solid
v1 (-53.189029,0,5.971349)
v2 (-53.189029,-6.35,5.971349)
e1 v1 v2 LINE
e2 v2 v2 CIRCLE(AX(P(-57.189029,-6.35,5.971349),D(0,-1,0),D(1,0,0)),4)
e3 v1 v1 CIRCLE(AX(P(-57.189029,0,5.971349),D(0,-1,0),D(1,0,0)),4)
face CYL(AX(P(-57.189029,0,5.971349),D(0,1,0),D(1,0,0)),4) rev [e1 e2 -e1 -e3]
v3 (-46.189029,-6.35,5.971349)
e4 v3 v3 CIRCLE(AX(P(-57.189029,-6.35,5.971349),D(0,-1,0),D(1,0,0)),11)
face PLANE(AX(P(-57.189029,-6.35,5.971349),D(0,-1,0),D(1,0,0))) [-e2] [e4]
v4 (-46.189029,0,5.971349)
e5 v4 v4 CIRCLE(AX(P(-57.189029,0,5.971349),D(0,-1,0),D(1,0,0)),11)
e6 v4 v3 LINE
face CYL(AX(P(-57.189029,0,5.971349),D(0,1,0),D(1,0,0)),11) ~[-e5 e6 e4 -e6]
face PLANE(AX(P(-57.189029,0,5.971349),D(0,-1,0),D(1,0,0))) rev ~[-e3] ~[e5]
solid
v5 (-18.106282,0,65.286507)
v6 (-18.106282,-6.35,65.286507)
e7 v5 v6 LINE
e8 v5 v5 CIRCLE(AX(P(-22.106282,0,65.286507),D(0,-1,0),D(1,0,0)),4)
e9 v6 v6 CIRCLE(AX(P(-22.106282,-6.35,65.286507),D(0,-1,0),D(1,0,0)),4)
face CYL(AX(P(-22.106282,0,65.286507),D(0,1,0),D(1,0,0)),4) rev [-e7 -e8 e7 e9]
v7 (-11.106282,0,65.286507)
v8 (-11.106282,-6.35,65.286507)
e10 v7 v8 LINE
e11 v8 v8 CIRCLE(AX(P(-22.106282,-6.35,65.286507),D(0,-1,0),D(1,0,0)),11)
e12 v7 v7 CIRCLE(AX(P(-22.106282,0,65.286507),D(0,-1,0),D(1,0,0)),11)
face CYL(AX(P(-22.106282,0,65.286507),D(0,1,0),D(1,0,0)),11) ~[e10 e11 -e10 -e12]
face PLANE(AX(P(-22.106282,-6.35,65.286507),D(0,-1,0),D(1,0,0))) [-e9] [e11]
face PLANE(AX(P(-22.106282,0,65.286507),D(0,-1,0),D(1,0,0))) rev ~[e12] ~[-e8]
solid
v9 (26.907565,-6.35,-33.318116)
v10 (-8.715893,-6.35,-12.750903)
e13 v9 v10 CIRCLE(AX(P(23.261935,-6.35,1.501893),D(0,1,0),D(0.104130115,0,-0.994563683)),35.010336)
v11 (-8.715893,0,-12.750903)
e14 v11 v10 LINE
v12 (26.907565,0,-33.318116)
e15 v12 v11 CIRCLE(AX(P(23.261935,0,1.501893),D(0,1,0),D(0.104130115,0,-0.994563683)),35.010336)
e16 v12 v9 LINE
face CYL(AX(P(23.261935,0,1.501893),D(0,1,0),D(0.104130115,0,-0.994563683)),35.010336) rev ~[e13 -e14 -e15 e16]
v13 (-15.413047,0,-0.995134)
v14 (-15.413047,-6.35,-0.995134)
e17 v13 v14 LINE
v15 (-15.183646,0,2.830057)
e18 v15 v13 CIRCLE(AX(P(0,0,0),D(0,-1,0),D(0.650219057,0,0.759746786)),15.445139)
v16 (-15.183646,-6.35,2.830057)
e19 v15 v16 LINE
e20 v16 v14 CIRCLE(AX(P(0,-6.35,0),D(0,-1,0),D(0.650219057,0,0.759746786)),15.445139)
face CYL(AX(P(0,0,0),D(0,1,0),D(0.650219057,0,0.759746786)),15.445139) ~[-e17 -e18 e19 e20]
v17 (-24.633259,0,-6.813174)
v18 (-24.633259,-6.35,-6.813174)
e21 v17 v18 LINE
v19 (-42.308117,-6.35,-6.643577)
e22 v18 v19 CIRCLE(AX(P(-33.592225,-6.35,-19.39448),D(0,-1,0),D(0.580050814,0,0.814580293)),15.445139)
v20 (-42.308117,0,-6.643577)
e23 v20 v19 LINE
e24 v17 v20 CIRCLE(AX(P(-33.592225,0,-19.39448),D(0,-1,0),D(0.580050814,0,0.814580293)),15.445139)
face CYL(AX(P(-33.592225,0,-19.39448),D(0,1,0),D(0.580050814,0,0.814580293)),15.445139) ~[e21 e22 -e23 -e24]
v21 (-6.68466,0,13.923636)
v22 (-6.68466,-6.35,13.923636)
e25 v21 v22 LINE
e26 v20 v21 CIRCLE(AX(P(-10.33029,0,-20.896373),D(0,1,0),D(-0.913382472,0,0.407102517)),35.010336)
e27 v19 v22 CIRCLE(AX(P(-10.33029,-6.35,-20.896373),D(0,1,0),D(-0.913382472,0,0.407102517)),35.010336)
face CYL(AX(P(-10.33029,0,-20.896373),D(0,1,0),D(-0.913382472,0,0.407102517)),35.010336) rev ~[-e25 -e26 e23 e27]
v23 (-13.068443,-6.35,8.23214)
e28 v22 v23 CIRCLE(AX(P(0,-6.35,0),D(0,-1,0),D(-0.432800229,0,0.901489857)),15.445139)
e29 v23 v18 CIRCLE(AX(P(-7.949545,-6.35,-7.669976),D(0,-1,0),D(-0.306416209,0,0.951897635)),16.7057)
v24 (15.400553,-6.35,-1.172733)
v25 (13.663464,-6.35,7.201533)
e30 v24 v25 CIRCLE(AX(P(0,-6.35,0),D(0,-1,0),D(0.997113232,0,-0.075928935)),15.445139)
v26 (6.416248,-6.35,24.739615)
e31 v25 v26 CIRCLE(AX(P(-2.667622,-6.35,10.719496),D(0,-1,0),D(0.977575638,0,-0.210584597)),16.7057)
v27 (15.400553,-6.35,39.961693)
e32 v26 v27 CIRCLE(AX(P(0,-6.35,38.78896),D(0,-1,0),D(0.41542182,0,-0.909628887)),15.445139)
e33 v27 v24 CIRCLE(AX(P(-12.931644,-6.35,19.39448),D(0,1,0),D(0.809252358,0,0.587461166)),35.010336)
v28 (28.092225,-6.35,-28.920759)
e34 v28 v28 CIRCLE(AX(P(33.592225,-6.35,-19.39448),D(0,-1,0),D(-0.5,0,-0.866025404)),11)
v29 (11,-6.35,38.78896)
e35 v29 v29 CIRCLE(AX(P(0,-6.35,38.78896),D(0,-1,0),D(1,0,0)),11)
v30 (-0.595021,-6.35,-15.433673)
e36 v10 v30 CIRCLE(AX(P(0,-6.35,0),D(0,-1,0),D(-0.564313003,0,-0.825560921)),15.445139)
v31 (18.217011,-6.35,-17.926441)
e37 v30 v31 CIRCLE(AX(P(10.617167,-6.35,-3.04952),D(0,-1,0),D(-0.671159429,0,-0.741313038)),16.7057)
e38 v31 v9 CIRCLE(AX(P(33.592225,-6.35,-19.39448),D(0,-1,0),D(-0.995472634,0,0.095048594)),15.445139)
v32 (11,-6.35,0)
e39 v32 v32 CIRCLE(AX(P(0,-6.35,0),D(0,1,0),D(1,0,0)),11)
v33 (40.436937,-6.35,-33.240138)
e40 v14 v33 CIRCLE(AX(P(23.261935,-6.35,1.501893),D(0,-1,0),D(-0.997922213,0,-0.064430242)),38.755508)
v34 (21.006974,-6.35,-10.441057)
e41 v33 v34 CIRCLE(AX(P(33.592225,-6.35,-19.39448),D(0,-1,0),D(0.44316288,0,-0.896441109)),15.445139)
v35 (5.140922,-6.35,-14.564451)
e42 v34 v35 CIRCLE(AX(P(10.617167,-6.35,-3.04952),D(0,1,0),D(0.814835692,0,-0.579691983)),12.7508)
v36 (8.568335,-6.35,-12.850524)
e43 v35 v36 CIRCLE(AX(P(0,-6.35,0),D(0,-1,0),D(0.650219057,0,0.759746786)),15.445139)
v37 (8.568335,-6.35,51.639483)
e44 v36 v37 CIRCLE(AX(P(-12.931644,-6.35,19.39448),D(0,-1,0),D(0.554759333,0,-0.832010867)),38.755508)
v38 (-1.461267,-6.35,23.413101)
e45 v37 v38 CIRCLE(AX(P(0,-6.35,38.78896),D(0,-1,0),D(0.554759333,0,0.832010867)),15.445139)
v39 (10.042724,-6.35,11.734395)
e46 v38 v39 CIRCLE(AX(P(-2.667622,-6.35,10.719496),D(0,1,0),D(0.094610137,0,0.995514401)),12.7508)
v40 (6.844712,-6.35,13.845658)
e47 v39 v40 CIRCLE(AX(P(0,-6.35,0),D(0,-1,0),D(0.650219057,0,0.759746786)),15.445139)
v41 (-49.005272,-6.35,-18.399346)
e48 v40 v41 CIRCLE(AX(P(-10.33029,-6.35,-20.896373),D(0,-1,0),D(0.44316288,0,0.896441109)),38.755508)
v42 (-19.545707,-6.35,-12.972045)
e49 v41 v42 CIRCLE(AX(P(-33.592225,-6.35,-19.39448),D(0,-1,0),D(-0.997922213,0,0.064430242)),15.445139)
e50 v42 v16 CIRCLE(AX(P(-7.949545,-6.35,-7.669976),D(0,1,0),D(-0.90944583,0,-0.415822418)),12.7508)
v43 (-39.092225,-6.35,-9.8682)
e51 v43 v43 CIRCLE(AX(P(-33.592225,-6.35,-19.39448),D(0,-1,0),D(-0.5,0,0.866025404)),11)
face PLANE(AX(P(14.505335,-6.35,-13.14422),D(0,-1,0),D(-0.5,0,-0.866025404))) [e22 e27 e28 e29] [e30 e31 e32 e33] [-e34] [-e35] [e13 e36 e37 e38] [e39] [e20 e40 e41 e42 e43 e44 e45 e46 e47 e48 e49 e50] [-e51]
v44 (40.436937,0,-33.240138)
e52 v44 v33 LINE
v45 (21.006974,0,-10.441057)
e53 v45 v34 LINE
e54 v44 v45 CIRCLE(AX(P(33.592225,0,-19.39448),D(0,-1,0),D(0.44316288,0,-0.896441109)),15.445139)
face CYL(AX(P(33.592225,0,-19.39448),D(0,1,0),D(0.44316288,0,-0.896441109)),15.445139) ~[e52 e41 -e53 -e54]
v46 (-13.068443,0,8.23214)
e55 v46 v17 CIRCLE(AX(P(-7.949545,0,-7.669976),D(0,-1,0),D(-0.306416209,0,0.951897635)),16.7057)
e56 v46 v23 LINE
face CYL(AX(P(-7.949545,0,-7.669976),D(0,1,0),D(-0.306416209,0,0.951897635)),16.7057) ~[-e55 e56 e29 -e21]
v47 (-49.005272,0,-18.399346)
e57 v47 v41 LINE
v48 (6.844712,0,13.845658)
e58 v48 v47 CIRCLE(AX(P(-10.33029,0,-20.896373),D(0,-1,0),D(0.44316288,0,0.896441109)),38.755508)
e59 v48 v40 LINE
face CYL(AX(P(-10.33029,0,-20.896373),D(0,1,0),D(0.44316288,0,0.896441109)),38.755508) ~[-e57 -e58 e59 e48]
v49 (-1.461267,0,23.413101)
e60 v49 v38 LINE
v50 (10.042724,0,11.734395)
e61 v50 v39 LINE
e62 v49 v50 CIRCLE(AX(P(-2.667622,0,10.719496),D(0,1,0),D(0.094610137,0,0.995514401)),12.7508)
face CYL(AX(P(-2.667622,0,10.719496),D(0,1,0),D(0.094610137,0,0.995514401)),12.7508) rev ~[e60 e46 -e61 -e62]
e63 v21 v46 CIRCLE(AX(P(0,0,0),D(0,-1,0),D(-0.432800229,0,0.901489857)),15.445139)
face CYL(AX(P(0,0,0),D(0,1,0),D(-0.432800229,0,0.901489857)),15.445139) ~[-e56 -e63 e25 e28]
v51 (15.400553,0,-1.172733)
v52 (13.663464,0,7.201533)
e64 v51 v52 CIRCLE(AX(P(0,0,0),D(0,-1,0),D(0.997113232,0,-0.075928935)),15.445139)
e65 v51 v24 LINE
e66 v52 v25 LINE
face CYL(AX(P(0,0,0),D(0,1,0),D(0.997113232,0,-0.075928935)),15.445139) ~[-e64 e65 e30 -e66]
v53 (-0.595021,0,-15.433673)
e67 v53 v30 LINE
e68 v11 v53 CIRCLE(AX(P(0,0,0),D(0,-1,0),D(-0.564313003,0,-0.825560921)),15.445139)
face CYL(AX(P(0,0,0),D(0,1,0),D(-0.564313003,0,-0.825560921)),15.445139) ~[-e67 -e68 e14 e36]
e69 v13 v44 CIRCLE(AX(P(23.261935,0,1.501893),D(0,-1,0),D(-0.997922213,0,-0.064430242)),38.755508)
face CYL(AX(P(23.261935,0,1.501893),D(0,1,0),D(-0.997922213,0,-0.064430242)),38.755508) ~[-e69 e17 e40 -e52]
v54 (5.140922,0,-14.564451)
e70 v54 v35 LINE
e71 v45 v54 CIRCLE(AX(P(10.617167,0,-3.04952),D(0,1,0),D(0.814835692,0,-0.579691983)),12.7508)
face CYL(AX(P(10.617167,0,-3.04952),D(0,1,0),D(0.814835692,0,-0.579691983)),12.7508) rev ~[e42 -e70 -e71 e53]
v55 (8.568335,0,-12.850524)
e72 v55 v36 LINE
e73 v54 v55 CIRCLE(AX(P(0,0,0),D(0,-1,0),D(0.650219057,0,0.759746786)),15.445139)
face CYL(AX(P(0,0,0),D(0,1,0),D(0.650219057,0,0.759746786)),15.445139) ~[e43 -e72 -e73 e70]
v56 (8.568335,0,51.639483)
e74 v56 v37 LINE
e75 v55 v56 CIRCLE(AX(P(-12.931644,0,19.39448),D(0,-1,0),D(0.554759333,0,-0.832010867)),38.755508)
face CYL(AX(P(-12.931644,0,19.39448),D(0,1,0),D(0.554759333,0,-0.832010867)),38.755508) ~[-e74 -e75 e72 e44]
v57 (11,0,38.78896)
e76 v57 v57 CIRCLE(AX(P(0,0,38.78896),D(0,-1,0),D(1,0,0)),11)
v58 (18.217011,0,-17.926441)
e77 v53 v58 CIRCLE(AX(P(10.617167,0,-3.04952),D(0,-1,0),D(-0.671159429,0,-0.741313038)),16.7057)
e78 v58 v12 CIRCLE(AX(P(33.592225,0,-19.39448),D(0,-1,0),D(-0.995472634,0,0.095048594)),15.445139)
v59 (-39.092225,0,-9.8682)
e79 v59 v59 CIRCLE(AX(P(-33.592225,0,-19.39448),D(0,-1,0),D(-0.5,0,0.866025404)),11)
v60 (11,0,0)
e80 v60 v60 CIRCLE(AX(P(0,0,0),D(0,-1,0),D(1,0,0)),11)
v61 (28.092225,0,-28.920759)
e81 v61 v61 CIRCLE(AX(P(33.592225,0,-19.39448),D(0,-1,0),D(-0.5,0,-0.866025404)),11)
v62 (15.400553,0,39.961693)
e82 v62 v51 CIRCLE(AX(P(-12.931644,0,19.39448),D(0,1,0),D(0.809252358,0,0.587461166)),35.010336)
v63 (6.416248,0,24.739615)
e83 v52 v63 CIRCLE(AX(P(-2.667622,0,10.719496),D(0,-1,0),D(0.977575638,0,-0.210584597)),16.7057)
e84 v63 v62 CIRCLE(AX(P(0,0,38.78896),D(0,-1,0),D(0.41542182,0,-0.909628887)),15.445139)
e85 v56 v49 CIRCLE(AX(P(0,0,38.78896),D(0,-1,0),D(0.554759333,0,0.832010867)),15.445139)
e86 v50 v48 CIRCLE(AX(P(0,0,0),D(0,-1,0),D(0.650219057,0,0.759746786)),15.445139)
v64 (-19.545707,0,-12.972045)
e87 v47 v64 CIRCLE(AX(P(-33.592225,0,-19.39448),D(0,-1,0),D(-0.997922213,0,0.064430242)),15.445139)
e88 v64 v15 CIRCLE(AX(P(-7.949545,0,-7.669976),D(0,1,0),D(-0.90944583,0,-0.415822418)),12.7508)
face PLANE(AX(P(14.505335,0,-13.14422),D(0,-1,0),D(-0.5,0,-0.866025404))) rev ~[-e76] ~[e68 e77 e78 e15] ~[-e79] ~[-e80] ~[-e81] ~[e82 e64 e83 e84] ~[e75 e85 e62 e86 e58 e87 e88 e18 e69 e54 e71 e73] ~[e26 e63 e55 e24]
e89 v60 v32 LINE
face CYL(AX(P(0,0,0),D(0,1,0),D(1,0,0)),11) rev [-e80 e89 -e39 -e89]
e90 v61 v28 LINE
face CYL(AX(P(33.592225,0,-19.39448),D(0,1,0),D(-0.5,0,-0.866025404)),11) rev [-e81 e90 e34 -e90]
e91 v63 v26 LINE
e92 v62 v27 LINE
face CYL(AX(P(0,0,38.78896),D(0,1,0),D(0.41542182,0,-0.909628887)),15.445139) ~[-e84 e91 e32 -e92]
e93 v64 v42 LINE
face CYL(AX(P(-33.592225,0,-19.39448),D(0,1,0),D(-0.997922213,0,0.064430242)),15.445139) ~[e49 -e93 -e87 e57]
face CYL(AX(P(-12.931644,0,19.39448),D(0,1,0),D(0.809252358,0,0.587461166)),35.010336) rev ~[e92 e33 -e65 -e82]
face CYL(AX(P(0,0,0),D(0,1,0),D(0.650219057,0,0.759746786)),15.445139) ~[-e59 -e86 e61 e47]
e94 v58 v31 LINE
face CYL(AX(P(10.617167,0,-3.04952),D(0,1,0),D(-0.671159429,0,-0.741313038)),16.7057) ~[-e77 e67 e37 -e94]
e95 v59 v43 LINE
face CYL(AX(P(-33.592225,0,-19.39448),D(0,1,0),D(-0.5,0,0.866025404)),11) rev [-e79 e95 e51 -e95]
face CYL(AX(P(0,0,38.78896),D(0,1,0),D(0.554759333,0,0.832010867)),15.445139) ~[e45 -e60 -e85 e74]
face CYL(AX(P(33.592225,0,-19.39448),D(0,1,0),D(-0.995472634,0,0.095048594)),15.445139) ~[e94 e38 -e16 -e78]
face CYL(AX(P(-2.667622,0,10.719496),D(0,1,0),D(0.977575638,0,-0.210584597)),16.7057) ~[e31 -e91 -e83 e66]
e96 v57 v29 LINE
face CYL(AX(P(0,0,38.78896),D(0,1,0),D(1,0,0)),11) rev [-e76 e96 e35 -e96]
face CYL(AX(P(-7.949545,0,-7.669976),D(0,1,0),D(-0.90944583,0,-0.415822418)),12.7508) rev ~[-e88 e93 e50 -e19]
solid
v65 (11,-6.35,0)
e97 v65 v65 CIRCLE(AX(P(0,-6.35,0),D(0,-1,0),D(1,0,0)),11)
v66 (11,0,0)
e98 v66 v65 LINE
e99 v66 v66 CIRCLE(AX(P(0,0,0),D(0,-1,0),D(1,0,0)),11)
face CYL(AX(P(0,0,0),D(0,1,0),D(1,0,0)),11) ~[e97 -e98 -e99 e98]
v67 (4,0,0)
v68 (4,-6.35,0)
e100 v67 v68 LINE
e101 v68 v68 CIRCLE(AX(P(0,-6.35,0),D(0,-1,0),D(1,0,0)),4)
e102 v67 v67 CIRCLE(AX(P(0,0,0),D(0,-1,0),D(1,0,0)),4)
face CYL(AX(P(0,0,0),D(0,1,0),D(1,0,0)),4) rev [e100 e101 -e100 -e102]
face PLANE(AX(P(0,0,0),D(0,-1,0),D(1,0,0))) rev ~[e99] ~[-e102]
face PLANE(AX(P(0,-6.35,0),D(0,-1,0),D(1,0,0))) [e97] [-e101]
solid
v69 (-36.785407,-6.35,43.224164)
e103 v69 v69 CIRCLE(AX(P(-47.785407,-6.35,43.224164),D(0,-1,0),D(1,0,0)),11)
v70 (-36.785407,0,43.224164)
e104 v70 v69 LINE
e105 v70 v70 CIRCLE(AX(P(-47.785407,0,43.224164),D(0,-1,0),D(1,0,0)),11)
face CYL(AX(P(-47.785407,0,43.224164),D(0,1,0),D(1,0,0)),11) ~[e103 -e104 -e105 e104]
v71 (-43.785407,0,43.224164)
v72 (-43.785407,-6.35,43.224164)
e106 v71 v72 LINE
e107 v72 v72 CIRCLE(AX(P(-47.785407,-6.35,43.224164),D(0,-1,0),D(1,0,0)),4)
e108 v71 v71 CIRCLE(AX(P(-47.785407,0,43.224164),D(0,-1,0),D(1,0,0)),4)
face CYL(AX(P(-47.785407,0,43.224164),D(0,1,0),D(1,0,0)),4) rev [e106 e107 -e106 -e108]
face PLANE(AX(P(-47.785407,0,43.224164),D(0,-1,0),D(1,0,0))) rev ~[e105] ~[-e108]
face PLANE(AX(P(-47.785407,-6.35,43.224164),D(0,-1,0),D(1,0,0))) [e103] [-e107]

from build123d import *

# Parameters (mm, degrees)
F1_R     = 11
F2_DEPTH = 6.35
F3_COUNT = 3
F1_R_2   = 4
F4_DEPTH = 6.35
F5_R     = 11
F5_R_2   = 4
F6_DEPTH = 6.35
F7_DEPTH = 6.35
F8_DEPTH = 6.35


with BuildPart() as f2:
    # F1 (on Front) → F2 (new body)
    with BuildSketch(Plane.XZ):
        with BuildLine():
            ThreePointArc((-1.4612667351, 23.4131014427), (6.4162478072, 19.6674691464), (10.0427237927, 11.7343947997))
            ThreePointArc((10.0427237927, 11.7343947997), (-15.4174391876, 0.9246033691), (8.5683350764, -12.850523589))
            ThreePointArc((8.5683350764, -12.850523589), (25.8238631569, 19.3944799292), (8.5683350764, 51.6394834474))
            ThreePointArc((8.5683350764, 51.6394834474), (-14.5536856284, 43.9602804945), (-1.4612667351, 23.4131014427))
        make_face()
        Circle(F1_R, mode=Mode.SUBTRACT)
        with Locations((0, 38.7889598584)):
            Circle(F1_R, mode=Mode.SUBTRACT)
        with BuildLine():
            ThreePointArc((13.6634637034, 7.2015333173), (12.7718103509, 17.0994927213), (6.4162478072, 24.7396151559))
            ThreePointArc((6.4162478072, 24.7396151559), (13.3011693847, 30.9384047512), (15.4005525832, 39.9616928305))
            ThreePointArc((15.4005525832, 39.9616928305), (22.0786916612, 19.3944799292), (15.4005525832, -1.1727329721))
            ThreePointArc((15.4005525832, -1.1727329721), (15.1232055017, 3.1370332871), (13.6634637034, 7.2015333173))
        make_face(mode=Mode.SUBTRACT)
    extrude(amount=F2_DEPTH)

    # F3: F2 ×3 about axis
    f3_axis = Axis((0, -6.35, 0), (0, -1, 0))


with BuildPart() as f2_1:
    add(f2.part)
    for i in range(1, F3_COUNT):
        add(f2.part.rotate(f3_axis, i * 360 / F3_COUNT))


with BuildPart() as f4:
    # F1 (on Front) → F4 (new body)
    with BuildSketch(Plane.XZ):
        Circle(F1_R)
        Circle(F1_R_2, mode=Mode.SUBTRACT)
    extrude(amount=F4_DEPTH)


with BuildPart() as f6:
    # F5 (on Front) → F6 (new body)
    with BuildSketch(Plane.XZ):
        with Locations((-22.1062817913, 65.2865074809)):
            Circle(F5_R)
        with Locations((-22.1062817913, 65.2865074809)):
            Circle(F5_R_2, mode=Mode.SUBTRACT)
    extrude(amount=F6_DEPTH)


with BuildPart() as f7:
    # F5 (on Front) → F7 (new body)
    with BuildSketch(Plane.XZ):
        with Locations((-47.7854066729, 43.2241640761)):
            Circle(F5_R)
        with Locations((-47.7854066729, 43.2241640761)):
            Circle(F5_R_2, mode=Mode.SUBTRACT)
    extrude(amount=F7_DEPTH)


with BuildPart() as f8:
    # F5 (on Front) → F8 (new body)
    with BuildSketch(Plane.XZ):
        with Locations((-57.1890292476, 5.9713492778)):
            Circle(F5_R)
        with Locations((-57.1890292476, 5.9713492778)):
            Circle(F5_R_2, mode=Mode.SUBTRACT)
    extrude(amount=F8_DEPTH)


solid = Compound([f2_1.part, f4.part, f6.part, f7.part, f8.part])
